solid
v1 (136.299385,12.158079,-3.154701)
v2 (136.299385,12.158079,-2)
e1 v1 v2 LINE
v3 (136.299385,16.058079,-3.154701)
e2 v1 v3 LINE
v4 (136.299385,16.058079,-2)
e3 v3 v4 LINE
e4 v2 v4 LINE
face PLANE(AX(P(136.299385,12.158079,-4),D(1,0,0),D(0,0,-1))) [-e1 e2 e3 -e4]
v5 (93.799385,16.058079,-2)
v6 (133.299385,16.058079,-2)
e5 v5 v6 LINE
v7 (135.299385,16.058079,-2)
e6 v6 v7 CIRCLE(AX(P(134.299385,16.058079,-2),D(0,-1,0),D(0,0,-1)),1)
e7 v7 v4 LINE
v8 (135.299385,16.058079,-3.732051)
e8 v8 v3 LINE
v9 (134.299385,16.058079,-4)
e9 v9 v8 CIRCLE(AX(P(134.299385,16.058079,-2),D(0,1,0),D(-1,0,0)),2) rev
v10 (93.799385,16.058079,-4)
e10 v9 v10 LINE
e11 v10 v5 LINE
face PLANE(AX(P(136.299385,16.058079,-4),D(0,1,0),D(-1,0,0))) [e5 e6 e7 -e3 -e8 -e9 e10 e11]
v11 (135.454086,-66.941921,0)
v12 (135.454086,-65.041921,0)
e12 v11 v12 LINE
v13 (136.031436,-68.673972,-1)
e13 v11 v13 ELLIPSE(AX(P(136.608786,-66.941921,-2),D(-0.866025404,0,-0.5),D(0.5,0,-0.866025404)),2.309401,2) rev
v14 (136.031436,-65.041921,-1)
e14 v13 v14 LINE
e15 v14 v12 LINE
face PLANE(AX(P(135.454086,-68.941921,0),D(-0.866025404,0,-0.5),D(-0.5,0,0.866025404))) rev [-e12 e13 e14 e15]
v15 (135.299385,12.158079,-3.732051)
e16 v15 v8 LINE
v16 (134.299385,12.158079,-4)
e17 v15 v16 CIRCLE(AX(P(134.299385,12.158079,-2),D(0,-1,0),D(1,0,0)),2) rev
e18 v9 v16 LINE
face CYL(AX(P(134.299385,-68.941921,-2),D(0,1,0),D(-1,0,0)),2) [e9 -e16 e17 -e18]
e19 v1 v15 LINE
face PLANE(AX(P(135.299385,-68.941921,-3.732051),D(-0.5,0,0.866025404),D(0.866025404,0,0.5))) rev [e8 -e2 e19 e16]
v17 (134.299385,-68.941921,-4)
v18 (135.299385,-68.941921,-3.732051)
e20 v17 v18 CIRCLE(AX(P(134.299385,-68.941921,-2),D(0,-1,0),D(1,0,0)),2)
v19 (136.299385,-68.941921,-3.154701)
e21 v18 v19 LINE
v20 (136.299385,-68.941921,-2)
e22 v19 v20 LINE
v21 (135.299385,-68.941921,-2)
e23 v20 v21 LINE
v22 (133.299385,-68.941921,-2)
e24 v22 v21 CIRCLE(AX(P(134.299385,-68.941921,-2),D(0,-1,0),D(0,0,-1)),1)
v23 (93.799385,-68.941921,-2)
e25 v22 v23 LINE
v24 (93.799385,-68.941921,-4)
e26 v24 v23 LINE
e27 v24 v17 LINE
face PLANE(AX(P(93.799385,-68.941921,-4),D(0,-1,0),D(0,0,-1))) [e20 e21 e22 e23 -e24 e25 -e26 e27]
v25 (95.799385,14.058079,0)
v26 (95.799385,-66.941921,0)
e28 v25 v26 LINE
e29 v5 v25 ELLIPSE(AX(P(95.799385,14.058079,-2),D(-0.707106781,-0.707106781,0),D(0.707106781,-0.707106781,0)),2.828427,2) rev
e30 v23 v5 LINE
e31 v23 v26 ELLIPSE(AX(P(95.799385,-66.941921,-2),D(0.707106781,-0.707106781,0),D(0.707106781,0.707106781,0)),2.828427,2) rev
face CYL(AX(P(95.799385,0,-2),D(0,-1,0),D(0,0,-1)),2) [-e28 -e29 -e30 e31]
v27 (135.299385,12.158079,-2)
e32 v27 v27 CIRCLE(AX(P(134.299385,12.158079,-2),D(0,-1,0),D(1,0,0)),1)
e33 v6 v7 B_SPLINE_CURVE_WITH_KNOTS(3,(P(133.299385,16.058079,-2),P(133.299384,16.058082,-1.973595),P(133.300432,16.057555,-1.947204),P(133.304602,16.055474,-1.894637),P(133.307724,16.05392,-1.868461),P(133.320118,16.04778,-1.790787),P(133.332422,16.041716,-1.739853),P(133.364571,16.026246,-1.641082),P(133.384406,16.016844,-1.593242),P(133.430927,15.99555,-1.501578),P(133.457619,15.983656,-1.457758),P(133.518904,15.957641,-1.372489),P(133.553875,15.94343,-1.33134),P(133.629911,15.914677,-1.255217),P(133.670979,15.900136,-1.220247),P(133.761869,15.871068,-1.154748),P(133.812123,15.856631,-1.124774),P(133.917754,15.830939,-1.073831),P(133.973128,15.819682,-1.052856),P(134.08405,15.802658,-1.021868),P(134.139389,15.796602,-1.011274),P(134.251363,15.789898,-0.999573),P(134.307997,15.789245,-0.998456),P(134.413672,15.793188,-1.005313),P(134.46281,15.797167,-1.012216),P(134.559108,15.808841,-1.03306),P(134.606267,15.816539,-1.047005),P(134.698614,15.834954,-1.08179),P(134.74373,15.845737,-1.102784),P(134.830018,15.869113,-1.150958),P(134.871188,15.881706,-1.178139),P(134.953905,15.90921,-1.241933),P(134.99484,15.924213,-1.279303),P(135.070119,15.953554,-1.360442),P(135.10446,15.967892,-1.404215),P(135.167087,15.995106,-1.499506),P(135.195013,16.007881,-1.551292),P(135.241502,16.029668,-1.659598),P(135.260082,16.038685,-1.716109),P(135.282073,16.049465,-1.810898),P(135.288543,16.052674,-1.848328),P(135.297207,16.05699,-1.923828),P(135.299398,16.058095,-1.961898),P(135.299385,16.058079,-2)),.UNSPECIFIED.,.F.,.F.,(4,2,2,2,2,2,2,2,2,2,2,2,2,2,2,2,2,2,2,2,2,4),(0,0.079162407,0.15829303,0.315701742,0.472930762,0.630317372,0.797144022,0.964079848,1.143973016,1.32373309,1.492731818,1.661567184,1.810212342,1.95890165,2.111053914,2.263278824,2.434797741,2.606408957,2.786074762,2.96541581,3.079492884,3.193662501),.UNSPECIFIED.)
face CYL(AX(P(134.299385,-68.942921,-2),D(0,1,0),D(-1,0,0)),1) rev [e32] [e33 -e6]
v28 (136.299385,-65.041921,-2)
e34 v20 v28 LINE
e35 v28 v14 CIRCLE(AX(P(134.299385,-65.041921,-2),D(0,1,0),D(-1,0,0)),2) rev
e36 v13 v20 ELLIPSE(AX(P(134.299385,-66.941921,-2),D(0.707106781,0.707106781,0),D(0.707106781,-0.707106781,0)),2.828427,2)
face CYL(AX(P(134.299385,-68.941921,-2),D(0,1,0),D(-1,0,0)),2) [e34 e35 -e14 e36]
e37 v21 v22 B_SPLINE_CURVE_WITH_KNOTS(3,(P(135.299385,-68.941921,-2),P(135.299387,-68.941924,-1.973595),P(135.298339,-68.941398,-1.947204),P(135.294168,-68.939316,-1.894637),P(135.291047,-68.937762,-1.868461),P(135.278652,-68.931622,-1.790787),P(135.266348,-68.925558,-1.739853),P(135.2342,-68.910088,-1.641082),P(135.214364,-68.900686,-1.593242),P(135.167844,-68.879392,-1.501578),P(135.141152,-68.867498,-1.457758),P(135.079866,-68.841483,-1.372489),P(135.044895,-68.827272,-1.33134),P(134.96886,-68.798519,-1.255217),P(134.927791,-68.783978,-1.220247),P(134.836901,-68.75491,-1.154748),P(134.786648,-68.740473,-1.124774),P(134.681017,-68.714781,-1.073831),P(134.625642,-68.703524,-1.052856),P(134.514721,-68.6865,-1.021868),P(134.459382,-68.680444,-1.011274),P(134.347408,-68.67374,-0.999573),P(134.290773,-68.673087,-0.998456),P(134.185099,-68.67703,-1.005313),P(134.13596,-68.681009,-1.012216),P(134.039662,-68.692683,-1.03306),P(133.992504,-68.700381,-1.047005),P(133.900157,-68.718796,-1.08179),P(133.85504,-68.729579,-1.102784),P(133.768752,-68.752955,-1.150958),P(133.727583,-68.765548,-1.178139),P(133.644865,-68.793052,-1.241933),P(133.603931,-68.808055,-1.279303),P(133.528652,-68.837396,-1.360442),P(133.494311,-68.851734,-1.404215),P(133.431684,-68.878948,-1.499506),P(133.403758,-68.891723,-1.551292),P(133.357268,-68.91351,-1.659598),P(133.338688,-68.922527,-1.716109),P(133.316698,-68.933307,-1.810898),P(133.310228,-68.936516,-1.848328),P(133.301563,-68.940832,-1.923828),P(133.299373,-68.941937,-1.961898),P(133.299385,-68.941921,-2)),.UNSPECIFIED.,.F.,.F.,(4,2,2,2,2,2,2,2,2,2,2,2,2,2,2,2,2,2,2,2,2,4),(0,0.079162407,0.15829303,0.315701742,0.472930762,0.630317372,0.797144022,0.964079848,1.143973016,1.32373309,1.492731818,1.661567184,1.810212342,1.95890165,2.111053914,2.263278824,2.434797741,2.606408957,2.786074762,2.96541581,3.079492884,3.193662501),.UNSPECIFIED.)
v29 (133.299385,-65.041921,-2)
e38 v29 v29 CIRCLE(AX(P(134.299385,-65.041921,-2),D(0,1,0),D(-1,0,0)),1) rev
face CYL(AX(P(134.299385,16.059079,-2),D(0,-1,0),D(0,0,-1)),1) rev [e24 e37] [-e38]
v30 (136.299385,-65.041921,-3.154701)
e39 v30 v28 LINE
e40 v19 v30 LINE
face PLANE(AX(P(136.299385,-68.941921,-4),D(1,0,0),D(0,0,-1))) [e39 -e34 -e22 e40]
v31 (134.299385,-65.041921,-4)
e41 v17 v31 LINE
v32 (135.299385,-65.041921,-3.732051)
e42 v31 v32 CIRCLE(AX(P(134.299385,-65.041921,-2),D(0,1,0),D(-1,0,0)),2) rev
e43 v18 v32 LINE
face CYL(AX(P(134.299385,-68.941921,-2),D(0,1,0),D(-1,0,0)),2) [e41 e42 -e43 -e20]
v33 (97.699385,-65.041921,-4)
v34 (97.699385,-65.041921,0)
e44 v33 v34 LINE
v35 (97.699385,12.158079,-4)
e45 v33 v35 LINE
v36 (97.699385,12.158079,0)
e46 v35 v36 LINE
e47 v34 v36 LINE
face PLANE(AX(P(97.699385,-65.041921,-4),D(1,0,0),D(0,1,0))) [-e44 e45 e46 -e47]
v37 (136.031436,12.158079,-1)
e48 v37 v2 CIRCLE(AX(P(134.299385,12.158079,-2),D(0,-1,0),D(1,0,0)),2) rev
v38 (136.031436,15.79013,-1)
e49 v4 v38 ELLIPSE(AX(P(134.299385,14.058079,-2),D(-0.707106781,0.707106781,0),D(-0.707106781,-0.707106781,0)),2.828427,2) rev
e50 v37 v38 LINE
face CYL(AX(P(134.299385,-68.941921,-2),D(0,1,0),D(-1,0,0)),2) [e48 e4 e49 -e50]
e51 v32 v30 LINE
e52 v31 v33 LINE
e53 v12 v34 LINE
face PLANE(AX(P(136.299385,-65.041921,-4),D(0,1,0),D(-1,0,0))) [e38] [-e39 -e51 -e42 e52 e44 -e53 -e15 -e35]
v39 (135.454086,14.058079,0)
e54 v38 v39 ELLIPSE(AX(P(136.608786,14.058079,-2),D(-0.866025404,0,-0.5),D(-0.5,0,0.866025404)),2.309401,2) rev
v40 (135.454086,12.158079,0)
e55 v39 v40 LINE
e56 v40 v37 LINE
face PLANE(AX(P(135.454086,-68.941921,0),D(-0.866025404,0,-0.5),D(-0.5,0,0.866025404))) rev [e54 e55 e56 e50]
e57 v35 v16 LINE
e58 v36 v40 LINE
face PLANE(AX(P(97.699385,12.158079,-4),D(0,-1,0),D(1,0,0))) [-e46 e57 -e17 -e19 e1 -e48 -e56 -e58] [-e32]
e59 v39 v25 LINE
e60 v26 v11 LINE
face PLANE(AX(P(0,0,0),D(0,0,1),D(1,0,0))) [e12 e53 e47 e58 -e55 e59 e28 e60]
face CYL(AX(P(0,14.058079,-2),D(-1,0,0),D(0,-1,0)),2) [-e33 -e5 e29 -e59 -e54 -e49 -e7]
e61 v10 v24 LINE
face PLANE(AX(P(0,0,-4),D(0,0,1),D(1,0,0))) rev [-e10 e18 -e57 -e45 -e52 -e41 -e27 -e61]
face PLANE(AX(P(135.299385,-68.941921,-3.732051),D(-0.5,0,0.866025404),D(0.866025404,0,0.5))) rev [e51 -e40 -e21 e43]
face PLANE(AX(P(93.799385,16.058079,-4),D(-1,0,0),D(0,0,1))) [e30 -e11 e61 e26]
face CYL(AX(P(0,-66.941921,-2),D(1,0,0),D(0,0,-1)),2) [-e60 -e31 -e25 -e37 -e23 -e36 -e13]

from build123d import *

# Parameters (mm, degrees)
EXTRUDE_1_DEPTH          = 4
CUT_EXTRUDE_1_REACH      = 162.681
SKETCH_2_R               = 1
CUT_EXTRUDE_2_DEPTH      = 161.68143152
CUT_EXTRUDE_2_DEPTH_BACK = 161.68143152
FILLET_1_R               = 2


with BuildPart() as part:
    # 草图1 → 凸台-拉伸1 (new body)
    with BuildSketch(Plane.XY):
        Polygon((136.299385308, -68.941921014), (136.299385308, -65.041921014), (97.699385308, -65.041921014), (97.699385308, 12.158078986), (136.299385308, 12.158078986), (136.299385308, 16.058078986), (93.799385308, 16.058078986), (93.799385308, -68.941921014), align=None)
    extrude(amount=-EXTRUDE_1_DEPTH)

    # 草图2 → 切除-拉伸1 (cut, up to next)
    with BuildSketch(Plane.XZ.offset(68.941921014), mode=Mode.PRIVATE) as cut_extrude_1_sk1:
        with Locations(Location((134.299385308, -2, 0), (0, 0, 270))):
            Circle(SKETCH_2_R)
    cut_extrude_1_tool1 = extrude(cut_extrude_1_sk1.sketch, amount=-CUT_EXTRUDE_1_REACH, mode=Mode.PRIVATE) & part.part
    cut_extrude_1 = cut_extrude_1_tool1.solids().sort_by_distance((134.299385, -68.941921, -2))[0]
    add(cut_extrude_1, mode=Mode.SUBTRACT)

    # 镜向1: 切除-拉伸1 across plane
    add(cut_extrude_1.mirror(Plane(origin=(0, -26.441921014, 0), x_dir=(0, 0, 1), z_dir=(0, -1, 0))), mode=Mode.SUBTRACT)

    # 草图3 → 切除-拉伸2 (cut, two sides: drawn at the far end of the back side and taken through both)
    with BuildSketch(Plane(origin=(0, 16.058078986, 0), x_dir=(1, 0, 0), z_dir=(0, 1, 0)).offset(-CUT_EXTRUDE_2_DEPTH_BACK)):
        with BuildLine():
            Line((136.299385308, 3.154700538), (136.299385308, 4))
            Line((136.299385308, 4), (134.299385308, 4))
            ThreePointArc((134.299385308, 4), (134.817023399, 3.931851653), (135.299385308, 3.732050808))
            Line((135.299385308, 3.732050808), (136.299385308, 3.154700538))
        make_face()
        with BuildLine():
            Line((135.454085847, 0), (136.031436116, 1))
            ThreePointArc((136.031436116, 1), (136.231236961, 1.48236191), (136.299385308, 2))
            Line((136.299385308, 2), (136.299385308, 1.464101615))
            Line((136.299385308, 1.464101615), (136.299385308, 0))
            Line((136.299385308, 0), (135.454085847, 0))
        make_face()
    extrude(amount=CUT_EXTRUDE_2_DEPTH + CUT_EXTRUDE_2_DEPTH_BACK, mode=Mode.SUBTRACT)

    # 圆角1
    # the kernel refuses this fillet: 2 mm, written as the material it takes off along each edge
    with BuildSketch(Plane(origin=(140.454085847, 16.058078986, 0), x_dir=(0, -1, 0), z_dir=(-1, 0, 0))) as fillet_1_piece_1:
        with BuildLine():
            CenterArc((FILLET_1_R, -FILLET_1_R), FILLET_1_R, 90, 90)
            Line((0, -FILLET_1_R), (0, 0))
            Line((0, 0), (FILLET_1_R, 0))
        make_face()
    extrude(amount=51.654700538, mode=Mode.SUBTRACT)
    with BuildSketch(Plane(origin=(93.799385308, 21.058078986, 0), x_dir=(1, 0, 0), z_dir=(0, -1, 0))) as fillet_1_piece_2:
        with BuildLine():
            CenterArc((FILLET_1_R, -FILLET_1_R), FILLET_1_R, 90, 90)
            Line((0, -FILLET_1_R), (0, 0))
            Line((0, 0), (FILLET_1_R, 0))
        make_face()
    extrude(amount=95, mode=Mode.SUBTRACT)
    with BuildSketch(Plane(origin=(88.799385308, -68.941921014, 0), x_dir=(0, 0, -1), z_dir=(1, 0, 0))) as fillet_1_piece_3:
        with BuildLine():
            CenterArc((FILLET_1_R, FILLET_1_R), FILLET_1_R, 180, 90)
            Line((0, FILLET_1_R), (0, 0))
            Line((0, 0), (FILLET_1_R, 0))
        make_face()
    extrude(amount=51.654700538, mode=Mode.SUBTRACT)


solid = part.part
